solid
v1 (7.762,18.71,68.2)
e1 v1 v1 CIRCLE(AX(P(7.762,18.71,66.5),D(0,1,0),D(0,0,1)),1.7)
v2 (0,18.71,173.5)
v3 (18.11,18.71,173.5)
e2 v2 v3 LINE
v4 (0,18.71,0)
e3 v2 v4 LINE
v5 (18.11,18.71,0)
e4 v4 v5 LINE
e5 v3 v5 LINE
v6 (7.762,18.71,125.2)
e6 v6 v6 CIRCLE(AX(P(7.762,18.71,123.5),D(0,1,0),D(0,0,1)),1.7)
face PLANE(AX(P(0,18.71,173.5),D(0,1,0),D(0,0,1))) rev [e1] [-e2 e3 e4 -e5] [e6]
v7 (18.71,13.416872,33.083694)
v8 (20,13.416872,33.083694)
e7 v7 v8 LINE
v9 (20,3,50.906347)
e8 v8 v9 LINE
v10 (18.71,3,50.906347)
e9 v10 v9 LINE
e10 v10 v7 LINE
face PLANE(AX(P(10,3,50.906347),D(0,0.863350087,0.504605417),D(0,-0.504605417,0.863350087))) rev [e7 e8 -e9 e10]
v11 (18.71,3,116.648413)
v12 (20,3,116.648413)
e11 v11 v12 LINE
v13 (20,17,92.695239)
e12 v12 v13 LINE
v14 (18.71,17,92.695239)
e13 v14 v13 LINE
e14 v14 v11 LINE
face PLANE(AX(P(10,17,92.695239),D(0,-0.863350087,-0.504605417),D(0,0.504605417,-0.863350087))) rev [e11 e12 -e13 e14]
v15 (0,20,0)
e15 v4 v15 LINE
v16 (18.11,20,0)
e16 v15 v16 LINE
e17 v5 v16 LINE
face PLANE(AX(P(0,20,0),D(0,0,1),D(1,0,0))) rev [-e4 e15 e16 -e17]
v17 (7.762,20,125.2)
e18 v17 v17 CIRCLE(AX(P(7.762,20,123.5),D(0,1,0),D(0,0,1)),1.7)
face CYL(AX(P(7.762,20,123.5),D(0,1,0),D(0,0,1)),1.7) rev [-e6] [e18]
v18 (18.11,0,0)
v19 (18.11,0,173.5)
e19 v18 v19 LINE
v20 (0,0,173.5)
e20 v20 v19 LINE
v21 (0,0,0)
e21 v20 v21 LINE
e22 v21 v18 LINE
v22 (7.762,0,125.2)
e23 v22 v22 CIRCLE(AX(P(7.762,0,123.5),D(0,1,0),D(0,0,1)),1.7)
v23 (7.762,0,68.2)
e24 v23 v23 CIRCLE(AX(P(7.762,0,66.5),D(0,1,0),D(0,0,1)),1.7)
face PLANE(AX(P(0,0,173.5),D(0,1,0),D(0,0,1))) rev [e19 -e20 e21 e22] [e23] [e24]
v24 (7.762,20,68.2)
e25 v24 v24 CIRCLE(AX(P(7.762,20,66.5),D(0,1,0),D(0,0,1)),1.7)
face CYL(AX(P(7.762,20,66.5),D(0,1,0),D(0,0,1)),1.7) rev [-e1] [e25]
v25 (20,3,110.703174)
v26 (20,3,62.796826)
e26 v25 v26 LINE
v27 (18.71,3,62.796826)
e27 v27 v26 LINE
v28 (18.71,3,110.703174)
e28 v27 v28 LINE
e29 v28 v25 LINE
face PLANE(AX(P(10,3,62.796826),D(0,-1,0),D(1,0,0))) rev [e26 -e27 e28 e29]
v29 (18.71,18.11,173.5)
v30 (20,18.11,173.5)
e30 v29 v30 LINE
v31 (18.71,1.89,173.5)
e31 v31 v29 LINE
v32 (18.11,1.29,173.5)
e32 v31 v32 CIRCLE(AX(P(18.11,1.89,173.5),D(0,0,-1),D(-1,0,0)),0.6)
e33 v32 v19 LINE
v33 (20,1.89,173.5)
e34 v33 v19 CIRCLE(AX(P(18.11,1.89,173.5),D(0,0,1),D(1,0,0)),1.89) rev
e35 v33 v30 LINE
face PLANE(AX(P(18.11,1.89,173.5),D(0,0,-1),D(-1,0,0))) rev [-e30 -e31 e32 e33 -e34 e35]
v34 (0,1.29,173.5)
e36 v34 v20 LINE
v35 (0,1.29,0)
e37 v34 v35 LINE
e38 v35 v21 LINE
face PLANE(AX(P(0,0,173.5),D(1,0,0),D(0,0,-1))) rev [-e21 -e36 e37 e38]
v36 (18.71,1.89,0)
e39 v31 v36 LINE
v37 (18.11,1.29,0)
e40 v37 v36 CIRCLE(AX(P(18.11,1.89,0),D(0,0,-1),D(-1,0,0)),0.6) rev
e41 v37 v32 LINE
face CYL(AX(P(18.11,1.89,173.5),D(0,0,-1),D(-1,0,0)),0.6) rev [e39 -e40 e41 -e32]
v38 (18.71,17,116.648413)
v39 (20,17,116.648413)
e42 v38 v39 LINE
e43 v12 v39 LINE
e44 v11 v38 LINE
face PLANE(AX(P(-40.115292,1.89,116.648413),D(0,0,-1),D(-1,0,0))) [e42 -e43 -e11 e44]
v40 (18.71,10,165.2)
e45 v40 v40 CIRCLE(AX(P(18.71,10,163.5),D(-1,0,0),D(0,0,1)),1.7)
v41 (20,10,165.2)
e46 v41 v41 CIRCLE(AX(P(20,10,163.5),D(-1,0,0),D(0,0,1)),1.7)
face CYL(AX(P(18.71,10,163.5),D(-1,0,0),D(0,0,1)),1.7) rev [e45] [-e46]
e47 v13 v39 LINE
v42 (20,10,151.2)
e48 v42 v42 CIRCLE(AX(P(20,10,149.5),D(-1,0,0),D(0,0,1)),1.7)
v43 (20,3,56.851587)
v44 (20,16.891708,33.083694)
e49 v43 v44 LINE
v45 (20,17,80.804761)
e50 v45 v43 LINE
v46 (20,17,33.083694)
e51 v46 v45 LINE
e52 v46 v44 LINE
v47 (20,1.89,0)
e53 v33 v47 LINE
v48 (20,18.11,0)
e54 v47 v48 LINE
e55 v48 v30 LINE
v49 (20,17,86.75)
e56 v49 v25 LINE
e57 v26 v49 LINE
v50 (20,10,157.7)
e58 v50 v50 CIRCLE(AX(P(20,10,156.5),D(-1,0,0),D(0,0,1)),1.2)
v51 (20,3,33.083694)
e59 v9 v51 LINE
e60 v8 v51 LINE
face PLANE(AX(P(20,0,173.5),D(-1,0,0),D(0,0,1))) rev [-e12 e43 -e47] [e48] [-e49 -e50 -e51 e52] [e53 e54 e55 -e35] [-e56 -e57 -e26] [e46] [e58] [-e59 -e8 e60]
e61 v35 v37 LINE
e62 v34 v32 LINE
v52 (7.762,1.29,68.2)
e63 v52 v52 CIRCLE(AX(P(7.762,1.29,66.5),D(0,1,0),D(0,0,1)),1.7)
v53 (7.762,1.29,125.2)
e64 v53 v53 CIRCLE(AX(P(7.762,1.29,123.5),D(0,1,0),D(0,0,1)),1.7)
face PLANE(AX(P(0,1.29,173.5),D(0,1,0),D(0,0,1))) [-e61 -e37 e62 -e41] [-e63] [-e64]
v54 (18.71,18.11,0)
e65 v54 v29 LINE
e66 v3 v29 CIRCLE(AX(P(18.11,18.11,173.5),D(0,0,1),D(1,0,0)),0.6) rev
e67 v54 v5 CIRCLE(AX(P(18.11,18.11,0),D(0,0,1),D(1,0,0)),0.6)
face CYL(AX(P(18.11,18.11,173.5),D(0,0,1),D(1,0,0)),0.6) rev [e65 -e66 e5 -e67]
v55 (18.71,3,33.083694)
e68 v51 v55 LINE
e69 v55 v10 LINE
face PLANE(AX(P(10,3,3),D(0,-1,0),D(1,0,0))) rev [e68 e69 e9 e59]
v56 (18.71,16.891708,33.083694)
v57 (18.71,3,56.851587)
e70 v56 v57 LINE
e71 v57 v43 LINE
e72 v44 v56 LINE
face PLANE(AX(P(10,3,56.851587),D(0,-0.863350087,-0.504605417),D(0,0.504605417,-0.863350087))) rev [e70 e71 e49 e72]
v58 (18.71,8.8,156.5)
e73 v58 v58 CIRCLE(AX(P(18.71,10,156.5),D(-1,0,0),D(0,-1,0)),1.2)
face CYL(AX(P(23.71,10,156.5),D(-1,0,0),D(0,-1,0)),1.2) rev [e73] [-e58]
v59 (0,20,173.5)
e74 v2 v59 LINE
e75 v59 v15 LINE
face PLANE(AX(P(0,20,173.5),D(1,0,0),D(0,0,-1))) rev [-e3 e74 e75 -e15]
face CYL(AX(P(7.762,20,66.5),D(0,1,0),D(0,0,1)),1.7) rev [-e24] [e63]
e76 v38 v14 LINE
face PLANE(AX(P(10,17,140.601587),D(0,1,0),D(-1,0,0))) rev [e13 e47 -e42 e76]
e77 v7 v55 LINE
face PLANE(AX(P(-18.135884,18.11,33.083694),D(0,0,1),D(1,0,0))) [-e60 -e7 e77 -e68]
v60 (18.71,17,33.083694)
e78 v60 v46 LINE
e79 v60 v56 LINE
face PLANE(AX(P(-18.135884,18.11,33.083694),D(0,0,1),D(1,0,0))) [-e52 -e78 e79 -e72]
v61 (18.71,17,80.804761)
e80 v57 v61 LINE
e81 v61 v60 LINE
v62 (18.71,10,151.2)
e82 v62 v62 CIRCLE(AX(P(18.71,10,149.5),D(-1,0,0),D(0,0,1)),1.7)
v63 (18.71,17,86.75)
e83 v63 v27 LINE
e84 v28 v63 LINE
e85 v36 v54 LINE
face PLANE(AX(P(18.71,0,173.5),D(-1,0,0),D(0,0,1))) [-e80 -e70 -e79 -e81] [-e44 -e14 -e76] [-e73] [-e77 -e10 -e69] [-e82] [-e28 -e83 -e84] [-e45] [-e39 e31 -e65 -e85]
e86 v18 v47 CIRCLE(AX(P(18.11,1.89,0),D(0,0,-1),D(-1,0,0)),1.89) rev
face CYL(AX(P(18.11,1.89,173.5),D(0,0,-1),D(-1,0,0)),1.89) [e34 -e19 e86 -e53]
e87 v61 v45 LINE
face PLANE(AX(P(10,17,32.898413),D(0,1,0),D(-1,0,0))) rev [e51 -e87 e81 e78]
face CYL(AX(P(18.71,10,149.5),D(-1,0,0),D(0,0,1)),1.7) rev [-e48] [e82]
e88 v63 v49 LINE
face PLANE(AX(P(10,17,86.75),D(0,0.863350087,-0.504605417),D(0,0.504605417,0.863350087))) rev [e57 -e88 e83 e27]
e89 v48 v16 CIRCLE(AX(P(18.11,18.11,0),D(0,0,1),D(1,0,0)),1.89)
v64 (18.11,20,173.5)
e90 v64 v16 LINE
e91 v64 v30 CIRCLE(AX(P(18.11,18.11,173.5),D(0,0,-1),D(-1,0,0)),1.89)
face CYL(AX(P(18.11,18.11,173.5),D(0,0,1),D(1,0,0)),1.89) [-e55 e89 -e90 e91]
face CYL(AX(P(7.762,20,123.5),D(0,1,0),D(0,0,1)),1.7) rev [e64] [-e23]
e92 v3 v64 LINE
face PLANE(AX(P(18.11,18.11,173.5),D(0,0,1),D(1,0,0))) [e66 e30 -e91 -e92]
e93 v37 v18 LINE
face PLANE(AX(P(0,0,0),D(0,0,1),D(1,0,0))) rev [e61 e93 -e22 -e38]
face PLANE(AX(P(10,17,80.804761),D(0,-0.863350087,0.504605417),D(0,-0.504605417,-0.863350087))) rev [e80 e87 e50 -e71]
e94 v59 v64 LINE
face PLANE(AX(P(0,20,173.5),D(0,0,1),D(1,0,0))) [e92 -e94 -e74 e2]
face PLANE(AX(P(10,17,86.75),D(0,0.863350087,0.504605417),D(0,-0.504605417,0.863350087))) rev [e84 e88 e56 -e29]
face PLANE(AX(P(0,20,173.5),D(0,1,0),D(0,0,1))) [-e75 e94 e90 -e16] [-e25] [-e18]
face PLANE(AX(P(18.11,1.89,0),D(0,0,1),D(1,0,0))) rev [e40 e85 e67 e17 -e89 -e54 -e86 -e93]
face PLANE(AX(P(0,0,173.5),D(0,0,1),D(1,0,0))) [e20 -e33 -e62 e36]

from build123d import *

# Parameters (mm, degrees)
SKETCH1_W                = 20
SKETCH1_H                = 20
BOSS_EXTRUDE1_DEPTH      = 173.5
CONVERT_SOLID1_DEPTH     = 173.5
CUT_EXTRUDE2_DEPTH       = 10
SKETCH15_W               = 56.851586871
SKETCH15_H               = 15.11
BOSS_EXTRUDE2_DEPTH      = 1.29
M3_CLEARANCE_HOLE1_D     = 3.4
M3_CLEARANCE_HOLE1_DEPTH = 3.34
M3_CLEARANCE_HOLE1_TIP   = 1.021463052
SKETCH20_R               = 1.2
CUT_EXTRUDE5_DEPTH       = 5
M3_CLEARANCE_HOLE2_D     = 3.4
SKETCH35_W               = 33.08369384
SKETCH35_H               = 16.22
BOSS_EXTRUDE3_DEPTH      = 1.29


# Read off the part's stored shape, not the designer's step: Convert-Solid1
with BuildPart() as part:
    # Sketch1 → Boss-Extrude1 (new body)
    with BuildSketch(Plane.XY):
        with Locations((10, 10)):
            Rectangle(SKETCH1_W, SKETCH1_H)
    extrude(amount=BOSS_EXTRUDE1_DEPTH)

    # Convert-Solid1 outline → Convert-Solid1 (cut)
    with BuildSketch(Plane.XY):
        with BuildLine():
            Line((20, 0), (20, 1.89))
            ThreePointArc((20, 1.89), (19.446431816, 0.553568184), (18.11, 0))
            Line((18.11, 0), (20, 0))
        make_face()
        with BuildLine():
            ThreePointArc((18.11, 20), (19.446431816, 19.446431816), (20, 18.11))
            Line((20, 18.11), (20, 20))
            Line((20, 20), (18.11, 20))
        make_face()
        with BuildLine():
            Line((0, 18.71), (0, 1.29))
            Line((0, 1.29), (18.11, 1.29))
            ThreePointArc((18.11, 1.29), (18.534264069, 1.465735931), (18.71, 1.89))
            Line((18.71, 1.89), (18.71, 18.11))
            ThreePointArc((18.71, 18.11), (18.534264069, 18.534264069), (18.11, 18.71))
            Line((18.11, 18.71), (0, 18.71))
        make_face()
    extrude(amount=CONVERT_SOLID1_DEPTH, mode=Mode.SUBTRACT)

    # Sketch3 → Cut-Extrude2 (cut)
    with BuildSketch(Plane(origin=(20, 0, 0), x_dir=(0, 0, -1), z_dir=(1, 0, 0))):
        Polygon((-86.75, 17), (-62.796826259, 3), (-110.703173741, 3), align=None)
        Polygon((-80.804760612, 17), (-56.851586871, 3), (-32.898413129, 17), align=None)
        Polygon((-50.906347483, 3), (-26.953173741, 17), (-3, 3), align=None)
        Polygon((-21.007934353, 17), (-3, 6.474836042), (-3, 17), align=None)
        Polygon((-170.5, 17), (-152.492065647, 17), (-170.5, 6.474836042), align=None)
        Polygon((-170.5, 3), (-122.593652517, 3), (-146.546826259, 17), align=None)
        Polygon((-140.601586871, 17), (-92.695239388, 17), (-116.648413129, 3), align=None)
    extrude(amount=-CUT_EXTRUDE2_DEPTH, mode=Mode.SUBTRACT)

    # Sketch15 → Boss-Extrude2 (add)
    with BuildSketch(Plane(origin=(20, 0, 0), x_dir=(0, 0, -1), z_dir=(1, 0, 0))):
        with Locations((-145.074206565, 9.445)):
            Rectangle(SKETCH15_W, SKETCH15_H)
    extrude(amount=-BOSS_EXTRUDE2_DEPTH)

    # M3 Clearance Hole1
    with Locations(Plane.ZY.offset(-18.71)):
        with Locations((163.5, 10), (149.5, 10)):
            Hole(M3_CLEARANCE_HOLE1_D / 2, depth=M3_CLEARANCE_HOLE1_DEPTH)
            with Locations((0, 0, -(M3_CLEARANCE_HOLE1_DEPTH + M3_CLEARANCE_HOLE1_TIP / 2))):  # 118° drill point
                Cone(0, M3_CLEARANCE_HOLE1_D / 2, M3_CLEARANCE_HOLE1_TIP, mode=Mode.SUBTRACT)

    # Sketch20 → Cut-Extrude5 (cut)
    with BuildSketch(Plane.ZY.offset(-18.71)):
        with Locations(Location((156.5, 10, 0), (0, 0, 270))):
            Circle(SKETCH20_R)
    extrude(amount=-CUT_EXTRUDE5_DEPTH, mode=Mode.SUBTRACT)

    # M3 Clearance Hole2 (through all)
    with Locations(Plane(origin=(85.70162808, 20, 101.952320986), x_dir=(0, 0, -1), z_dir=(0, 1, 0))):
        with Locations((-21.547679014, 77.93962808), (35.452320986, 77.93962808)):
            Hole(M3_CLEARANCE_HOLE2_D / 2)

    # Sketch35 → Boss-Extrude3 (add)
    with BuildSketch(Plane(origin=(20, 0, 0), x_dir=(0, 0, -1), z_dir=(1, 0, 0))):
        with Locations((-16.54184692, 10)):
            Rectangle(SKETCH35_W, SKETCH35_H)
    extrude(amount=-BOSS_EXTRUDE3_DEPTH)


solid = part.part
